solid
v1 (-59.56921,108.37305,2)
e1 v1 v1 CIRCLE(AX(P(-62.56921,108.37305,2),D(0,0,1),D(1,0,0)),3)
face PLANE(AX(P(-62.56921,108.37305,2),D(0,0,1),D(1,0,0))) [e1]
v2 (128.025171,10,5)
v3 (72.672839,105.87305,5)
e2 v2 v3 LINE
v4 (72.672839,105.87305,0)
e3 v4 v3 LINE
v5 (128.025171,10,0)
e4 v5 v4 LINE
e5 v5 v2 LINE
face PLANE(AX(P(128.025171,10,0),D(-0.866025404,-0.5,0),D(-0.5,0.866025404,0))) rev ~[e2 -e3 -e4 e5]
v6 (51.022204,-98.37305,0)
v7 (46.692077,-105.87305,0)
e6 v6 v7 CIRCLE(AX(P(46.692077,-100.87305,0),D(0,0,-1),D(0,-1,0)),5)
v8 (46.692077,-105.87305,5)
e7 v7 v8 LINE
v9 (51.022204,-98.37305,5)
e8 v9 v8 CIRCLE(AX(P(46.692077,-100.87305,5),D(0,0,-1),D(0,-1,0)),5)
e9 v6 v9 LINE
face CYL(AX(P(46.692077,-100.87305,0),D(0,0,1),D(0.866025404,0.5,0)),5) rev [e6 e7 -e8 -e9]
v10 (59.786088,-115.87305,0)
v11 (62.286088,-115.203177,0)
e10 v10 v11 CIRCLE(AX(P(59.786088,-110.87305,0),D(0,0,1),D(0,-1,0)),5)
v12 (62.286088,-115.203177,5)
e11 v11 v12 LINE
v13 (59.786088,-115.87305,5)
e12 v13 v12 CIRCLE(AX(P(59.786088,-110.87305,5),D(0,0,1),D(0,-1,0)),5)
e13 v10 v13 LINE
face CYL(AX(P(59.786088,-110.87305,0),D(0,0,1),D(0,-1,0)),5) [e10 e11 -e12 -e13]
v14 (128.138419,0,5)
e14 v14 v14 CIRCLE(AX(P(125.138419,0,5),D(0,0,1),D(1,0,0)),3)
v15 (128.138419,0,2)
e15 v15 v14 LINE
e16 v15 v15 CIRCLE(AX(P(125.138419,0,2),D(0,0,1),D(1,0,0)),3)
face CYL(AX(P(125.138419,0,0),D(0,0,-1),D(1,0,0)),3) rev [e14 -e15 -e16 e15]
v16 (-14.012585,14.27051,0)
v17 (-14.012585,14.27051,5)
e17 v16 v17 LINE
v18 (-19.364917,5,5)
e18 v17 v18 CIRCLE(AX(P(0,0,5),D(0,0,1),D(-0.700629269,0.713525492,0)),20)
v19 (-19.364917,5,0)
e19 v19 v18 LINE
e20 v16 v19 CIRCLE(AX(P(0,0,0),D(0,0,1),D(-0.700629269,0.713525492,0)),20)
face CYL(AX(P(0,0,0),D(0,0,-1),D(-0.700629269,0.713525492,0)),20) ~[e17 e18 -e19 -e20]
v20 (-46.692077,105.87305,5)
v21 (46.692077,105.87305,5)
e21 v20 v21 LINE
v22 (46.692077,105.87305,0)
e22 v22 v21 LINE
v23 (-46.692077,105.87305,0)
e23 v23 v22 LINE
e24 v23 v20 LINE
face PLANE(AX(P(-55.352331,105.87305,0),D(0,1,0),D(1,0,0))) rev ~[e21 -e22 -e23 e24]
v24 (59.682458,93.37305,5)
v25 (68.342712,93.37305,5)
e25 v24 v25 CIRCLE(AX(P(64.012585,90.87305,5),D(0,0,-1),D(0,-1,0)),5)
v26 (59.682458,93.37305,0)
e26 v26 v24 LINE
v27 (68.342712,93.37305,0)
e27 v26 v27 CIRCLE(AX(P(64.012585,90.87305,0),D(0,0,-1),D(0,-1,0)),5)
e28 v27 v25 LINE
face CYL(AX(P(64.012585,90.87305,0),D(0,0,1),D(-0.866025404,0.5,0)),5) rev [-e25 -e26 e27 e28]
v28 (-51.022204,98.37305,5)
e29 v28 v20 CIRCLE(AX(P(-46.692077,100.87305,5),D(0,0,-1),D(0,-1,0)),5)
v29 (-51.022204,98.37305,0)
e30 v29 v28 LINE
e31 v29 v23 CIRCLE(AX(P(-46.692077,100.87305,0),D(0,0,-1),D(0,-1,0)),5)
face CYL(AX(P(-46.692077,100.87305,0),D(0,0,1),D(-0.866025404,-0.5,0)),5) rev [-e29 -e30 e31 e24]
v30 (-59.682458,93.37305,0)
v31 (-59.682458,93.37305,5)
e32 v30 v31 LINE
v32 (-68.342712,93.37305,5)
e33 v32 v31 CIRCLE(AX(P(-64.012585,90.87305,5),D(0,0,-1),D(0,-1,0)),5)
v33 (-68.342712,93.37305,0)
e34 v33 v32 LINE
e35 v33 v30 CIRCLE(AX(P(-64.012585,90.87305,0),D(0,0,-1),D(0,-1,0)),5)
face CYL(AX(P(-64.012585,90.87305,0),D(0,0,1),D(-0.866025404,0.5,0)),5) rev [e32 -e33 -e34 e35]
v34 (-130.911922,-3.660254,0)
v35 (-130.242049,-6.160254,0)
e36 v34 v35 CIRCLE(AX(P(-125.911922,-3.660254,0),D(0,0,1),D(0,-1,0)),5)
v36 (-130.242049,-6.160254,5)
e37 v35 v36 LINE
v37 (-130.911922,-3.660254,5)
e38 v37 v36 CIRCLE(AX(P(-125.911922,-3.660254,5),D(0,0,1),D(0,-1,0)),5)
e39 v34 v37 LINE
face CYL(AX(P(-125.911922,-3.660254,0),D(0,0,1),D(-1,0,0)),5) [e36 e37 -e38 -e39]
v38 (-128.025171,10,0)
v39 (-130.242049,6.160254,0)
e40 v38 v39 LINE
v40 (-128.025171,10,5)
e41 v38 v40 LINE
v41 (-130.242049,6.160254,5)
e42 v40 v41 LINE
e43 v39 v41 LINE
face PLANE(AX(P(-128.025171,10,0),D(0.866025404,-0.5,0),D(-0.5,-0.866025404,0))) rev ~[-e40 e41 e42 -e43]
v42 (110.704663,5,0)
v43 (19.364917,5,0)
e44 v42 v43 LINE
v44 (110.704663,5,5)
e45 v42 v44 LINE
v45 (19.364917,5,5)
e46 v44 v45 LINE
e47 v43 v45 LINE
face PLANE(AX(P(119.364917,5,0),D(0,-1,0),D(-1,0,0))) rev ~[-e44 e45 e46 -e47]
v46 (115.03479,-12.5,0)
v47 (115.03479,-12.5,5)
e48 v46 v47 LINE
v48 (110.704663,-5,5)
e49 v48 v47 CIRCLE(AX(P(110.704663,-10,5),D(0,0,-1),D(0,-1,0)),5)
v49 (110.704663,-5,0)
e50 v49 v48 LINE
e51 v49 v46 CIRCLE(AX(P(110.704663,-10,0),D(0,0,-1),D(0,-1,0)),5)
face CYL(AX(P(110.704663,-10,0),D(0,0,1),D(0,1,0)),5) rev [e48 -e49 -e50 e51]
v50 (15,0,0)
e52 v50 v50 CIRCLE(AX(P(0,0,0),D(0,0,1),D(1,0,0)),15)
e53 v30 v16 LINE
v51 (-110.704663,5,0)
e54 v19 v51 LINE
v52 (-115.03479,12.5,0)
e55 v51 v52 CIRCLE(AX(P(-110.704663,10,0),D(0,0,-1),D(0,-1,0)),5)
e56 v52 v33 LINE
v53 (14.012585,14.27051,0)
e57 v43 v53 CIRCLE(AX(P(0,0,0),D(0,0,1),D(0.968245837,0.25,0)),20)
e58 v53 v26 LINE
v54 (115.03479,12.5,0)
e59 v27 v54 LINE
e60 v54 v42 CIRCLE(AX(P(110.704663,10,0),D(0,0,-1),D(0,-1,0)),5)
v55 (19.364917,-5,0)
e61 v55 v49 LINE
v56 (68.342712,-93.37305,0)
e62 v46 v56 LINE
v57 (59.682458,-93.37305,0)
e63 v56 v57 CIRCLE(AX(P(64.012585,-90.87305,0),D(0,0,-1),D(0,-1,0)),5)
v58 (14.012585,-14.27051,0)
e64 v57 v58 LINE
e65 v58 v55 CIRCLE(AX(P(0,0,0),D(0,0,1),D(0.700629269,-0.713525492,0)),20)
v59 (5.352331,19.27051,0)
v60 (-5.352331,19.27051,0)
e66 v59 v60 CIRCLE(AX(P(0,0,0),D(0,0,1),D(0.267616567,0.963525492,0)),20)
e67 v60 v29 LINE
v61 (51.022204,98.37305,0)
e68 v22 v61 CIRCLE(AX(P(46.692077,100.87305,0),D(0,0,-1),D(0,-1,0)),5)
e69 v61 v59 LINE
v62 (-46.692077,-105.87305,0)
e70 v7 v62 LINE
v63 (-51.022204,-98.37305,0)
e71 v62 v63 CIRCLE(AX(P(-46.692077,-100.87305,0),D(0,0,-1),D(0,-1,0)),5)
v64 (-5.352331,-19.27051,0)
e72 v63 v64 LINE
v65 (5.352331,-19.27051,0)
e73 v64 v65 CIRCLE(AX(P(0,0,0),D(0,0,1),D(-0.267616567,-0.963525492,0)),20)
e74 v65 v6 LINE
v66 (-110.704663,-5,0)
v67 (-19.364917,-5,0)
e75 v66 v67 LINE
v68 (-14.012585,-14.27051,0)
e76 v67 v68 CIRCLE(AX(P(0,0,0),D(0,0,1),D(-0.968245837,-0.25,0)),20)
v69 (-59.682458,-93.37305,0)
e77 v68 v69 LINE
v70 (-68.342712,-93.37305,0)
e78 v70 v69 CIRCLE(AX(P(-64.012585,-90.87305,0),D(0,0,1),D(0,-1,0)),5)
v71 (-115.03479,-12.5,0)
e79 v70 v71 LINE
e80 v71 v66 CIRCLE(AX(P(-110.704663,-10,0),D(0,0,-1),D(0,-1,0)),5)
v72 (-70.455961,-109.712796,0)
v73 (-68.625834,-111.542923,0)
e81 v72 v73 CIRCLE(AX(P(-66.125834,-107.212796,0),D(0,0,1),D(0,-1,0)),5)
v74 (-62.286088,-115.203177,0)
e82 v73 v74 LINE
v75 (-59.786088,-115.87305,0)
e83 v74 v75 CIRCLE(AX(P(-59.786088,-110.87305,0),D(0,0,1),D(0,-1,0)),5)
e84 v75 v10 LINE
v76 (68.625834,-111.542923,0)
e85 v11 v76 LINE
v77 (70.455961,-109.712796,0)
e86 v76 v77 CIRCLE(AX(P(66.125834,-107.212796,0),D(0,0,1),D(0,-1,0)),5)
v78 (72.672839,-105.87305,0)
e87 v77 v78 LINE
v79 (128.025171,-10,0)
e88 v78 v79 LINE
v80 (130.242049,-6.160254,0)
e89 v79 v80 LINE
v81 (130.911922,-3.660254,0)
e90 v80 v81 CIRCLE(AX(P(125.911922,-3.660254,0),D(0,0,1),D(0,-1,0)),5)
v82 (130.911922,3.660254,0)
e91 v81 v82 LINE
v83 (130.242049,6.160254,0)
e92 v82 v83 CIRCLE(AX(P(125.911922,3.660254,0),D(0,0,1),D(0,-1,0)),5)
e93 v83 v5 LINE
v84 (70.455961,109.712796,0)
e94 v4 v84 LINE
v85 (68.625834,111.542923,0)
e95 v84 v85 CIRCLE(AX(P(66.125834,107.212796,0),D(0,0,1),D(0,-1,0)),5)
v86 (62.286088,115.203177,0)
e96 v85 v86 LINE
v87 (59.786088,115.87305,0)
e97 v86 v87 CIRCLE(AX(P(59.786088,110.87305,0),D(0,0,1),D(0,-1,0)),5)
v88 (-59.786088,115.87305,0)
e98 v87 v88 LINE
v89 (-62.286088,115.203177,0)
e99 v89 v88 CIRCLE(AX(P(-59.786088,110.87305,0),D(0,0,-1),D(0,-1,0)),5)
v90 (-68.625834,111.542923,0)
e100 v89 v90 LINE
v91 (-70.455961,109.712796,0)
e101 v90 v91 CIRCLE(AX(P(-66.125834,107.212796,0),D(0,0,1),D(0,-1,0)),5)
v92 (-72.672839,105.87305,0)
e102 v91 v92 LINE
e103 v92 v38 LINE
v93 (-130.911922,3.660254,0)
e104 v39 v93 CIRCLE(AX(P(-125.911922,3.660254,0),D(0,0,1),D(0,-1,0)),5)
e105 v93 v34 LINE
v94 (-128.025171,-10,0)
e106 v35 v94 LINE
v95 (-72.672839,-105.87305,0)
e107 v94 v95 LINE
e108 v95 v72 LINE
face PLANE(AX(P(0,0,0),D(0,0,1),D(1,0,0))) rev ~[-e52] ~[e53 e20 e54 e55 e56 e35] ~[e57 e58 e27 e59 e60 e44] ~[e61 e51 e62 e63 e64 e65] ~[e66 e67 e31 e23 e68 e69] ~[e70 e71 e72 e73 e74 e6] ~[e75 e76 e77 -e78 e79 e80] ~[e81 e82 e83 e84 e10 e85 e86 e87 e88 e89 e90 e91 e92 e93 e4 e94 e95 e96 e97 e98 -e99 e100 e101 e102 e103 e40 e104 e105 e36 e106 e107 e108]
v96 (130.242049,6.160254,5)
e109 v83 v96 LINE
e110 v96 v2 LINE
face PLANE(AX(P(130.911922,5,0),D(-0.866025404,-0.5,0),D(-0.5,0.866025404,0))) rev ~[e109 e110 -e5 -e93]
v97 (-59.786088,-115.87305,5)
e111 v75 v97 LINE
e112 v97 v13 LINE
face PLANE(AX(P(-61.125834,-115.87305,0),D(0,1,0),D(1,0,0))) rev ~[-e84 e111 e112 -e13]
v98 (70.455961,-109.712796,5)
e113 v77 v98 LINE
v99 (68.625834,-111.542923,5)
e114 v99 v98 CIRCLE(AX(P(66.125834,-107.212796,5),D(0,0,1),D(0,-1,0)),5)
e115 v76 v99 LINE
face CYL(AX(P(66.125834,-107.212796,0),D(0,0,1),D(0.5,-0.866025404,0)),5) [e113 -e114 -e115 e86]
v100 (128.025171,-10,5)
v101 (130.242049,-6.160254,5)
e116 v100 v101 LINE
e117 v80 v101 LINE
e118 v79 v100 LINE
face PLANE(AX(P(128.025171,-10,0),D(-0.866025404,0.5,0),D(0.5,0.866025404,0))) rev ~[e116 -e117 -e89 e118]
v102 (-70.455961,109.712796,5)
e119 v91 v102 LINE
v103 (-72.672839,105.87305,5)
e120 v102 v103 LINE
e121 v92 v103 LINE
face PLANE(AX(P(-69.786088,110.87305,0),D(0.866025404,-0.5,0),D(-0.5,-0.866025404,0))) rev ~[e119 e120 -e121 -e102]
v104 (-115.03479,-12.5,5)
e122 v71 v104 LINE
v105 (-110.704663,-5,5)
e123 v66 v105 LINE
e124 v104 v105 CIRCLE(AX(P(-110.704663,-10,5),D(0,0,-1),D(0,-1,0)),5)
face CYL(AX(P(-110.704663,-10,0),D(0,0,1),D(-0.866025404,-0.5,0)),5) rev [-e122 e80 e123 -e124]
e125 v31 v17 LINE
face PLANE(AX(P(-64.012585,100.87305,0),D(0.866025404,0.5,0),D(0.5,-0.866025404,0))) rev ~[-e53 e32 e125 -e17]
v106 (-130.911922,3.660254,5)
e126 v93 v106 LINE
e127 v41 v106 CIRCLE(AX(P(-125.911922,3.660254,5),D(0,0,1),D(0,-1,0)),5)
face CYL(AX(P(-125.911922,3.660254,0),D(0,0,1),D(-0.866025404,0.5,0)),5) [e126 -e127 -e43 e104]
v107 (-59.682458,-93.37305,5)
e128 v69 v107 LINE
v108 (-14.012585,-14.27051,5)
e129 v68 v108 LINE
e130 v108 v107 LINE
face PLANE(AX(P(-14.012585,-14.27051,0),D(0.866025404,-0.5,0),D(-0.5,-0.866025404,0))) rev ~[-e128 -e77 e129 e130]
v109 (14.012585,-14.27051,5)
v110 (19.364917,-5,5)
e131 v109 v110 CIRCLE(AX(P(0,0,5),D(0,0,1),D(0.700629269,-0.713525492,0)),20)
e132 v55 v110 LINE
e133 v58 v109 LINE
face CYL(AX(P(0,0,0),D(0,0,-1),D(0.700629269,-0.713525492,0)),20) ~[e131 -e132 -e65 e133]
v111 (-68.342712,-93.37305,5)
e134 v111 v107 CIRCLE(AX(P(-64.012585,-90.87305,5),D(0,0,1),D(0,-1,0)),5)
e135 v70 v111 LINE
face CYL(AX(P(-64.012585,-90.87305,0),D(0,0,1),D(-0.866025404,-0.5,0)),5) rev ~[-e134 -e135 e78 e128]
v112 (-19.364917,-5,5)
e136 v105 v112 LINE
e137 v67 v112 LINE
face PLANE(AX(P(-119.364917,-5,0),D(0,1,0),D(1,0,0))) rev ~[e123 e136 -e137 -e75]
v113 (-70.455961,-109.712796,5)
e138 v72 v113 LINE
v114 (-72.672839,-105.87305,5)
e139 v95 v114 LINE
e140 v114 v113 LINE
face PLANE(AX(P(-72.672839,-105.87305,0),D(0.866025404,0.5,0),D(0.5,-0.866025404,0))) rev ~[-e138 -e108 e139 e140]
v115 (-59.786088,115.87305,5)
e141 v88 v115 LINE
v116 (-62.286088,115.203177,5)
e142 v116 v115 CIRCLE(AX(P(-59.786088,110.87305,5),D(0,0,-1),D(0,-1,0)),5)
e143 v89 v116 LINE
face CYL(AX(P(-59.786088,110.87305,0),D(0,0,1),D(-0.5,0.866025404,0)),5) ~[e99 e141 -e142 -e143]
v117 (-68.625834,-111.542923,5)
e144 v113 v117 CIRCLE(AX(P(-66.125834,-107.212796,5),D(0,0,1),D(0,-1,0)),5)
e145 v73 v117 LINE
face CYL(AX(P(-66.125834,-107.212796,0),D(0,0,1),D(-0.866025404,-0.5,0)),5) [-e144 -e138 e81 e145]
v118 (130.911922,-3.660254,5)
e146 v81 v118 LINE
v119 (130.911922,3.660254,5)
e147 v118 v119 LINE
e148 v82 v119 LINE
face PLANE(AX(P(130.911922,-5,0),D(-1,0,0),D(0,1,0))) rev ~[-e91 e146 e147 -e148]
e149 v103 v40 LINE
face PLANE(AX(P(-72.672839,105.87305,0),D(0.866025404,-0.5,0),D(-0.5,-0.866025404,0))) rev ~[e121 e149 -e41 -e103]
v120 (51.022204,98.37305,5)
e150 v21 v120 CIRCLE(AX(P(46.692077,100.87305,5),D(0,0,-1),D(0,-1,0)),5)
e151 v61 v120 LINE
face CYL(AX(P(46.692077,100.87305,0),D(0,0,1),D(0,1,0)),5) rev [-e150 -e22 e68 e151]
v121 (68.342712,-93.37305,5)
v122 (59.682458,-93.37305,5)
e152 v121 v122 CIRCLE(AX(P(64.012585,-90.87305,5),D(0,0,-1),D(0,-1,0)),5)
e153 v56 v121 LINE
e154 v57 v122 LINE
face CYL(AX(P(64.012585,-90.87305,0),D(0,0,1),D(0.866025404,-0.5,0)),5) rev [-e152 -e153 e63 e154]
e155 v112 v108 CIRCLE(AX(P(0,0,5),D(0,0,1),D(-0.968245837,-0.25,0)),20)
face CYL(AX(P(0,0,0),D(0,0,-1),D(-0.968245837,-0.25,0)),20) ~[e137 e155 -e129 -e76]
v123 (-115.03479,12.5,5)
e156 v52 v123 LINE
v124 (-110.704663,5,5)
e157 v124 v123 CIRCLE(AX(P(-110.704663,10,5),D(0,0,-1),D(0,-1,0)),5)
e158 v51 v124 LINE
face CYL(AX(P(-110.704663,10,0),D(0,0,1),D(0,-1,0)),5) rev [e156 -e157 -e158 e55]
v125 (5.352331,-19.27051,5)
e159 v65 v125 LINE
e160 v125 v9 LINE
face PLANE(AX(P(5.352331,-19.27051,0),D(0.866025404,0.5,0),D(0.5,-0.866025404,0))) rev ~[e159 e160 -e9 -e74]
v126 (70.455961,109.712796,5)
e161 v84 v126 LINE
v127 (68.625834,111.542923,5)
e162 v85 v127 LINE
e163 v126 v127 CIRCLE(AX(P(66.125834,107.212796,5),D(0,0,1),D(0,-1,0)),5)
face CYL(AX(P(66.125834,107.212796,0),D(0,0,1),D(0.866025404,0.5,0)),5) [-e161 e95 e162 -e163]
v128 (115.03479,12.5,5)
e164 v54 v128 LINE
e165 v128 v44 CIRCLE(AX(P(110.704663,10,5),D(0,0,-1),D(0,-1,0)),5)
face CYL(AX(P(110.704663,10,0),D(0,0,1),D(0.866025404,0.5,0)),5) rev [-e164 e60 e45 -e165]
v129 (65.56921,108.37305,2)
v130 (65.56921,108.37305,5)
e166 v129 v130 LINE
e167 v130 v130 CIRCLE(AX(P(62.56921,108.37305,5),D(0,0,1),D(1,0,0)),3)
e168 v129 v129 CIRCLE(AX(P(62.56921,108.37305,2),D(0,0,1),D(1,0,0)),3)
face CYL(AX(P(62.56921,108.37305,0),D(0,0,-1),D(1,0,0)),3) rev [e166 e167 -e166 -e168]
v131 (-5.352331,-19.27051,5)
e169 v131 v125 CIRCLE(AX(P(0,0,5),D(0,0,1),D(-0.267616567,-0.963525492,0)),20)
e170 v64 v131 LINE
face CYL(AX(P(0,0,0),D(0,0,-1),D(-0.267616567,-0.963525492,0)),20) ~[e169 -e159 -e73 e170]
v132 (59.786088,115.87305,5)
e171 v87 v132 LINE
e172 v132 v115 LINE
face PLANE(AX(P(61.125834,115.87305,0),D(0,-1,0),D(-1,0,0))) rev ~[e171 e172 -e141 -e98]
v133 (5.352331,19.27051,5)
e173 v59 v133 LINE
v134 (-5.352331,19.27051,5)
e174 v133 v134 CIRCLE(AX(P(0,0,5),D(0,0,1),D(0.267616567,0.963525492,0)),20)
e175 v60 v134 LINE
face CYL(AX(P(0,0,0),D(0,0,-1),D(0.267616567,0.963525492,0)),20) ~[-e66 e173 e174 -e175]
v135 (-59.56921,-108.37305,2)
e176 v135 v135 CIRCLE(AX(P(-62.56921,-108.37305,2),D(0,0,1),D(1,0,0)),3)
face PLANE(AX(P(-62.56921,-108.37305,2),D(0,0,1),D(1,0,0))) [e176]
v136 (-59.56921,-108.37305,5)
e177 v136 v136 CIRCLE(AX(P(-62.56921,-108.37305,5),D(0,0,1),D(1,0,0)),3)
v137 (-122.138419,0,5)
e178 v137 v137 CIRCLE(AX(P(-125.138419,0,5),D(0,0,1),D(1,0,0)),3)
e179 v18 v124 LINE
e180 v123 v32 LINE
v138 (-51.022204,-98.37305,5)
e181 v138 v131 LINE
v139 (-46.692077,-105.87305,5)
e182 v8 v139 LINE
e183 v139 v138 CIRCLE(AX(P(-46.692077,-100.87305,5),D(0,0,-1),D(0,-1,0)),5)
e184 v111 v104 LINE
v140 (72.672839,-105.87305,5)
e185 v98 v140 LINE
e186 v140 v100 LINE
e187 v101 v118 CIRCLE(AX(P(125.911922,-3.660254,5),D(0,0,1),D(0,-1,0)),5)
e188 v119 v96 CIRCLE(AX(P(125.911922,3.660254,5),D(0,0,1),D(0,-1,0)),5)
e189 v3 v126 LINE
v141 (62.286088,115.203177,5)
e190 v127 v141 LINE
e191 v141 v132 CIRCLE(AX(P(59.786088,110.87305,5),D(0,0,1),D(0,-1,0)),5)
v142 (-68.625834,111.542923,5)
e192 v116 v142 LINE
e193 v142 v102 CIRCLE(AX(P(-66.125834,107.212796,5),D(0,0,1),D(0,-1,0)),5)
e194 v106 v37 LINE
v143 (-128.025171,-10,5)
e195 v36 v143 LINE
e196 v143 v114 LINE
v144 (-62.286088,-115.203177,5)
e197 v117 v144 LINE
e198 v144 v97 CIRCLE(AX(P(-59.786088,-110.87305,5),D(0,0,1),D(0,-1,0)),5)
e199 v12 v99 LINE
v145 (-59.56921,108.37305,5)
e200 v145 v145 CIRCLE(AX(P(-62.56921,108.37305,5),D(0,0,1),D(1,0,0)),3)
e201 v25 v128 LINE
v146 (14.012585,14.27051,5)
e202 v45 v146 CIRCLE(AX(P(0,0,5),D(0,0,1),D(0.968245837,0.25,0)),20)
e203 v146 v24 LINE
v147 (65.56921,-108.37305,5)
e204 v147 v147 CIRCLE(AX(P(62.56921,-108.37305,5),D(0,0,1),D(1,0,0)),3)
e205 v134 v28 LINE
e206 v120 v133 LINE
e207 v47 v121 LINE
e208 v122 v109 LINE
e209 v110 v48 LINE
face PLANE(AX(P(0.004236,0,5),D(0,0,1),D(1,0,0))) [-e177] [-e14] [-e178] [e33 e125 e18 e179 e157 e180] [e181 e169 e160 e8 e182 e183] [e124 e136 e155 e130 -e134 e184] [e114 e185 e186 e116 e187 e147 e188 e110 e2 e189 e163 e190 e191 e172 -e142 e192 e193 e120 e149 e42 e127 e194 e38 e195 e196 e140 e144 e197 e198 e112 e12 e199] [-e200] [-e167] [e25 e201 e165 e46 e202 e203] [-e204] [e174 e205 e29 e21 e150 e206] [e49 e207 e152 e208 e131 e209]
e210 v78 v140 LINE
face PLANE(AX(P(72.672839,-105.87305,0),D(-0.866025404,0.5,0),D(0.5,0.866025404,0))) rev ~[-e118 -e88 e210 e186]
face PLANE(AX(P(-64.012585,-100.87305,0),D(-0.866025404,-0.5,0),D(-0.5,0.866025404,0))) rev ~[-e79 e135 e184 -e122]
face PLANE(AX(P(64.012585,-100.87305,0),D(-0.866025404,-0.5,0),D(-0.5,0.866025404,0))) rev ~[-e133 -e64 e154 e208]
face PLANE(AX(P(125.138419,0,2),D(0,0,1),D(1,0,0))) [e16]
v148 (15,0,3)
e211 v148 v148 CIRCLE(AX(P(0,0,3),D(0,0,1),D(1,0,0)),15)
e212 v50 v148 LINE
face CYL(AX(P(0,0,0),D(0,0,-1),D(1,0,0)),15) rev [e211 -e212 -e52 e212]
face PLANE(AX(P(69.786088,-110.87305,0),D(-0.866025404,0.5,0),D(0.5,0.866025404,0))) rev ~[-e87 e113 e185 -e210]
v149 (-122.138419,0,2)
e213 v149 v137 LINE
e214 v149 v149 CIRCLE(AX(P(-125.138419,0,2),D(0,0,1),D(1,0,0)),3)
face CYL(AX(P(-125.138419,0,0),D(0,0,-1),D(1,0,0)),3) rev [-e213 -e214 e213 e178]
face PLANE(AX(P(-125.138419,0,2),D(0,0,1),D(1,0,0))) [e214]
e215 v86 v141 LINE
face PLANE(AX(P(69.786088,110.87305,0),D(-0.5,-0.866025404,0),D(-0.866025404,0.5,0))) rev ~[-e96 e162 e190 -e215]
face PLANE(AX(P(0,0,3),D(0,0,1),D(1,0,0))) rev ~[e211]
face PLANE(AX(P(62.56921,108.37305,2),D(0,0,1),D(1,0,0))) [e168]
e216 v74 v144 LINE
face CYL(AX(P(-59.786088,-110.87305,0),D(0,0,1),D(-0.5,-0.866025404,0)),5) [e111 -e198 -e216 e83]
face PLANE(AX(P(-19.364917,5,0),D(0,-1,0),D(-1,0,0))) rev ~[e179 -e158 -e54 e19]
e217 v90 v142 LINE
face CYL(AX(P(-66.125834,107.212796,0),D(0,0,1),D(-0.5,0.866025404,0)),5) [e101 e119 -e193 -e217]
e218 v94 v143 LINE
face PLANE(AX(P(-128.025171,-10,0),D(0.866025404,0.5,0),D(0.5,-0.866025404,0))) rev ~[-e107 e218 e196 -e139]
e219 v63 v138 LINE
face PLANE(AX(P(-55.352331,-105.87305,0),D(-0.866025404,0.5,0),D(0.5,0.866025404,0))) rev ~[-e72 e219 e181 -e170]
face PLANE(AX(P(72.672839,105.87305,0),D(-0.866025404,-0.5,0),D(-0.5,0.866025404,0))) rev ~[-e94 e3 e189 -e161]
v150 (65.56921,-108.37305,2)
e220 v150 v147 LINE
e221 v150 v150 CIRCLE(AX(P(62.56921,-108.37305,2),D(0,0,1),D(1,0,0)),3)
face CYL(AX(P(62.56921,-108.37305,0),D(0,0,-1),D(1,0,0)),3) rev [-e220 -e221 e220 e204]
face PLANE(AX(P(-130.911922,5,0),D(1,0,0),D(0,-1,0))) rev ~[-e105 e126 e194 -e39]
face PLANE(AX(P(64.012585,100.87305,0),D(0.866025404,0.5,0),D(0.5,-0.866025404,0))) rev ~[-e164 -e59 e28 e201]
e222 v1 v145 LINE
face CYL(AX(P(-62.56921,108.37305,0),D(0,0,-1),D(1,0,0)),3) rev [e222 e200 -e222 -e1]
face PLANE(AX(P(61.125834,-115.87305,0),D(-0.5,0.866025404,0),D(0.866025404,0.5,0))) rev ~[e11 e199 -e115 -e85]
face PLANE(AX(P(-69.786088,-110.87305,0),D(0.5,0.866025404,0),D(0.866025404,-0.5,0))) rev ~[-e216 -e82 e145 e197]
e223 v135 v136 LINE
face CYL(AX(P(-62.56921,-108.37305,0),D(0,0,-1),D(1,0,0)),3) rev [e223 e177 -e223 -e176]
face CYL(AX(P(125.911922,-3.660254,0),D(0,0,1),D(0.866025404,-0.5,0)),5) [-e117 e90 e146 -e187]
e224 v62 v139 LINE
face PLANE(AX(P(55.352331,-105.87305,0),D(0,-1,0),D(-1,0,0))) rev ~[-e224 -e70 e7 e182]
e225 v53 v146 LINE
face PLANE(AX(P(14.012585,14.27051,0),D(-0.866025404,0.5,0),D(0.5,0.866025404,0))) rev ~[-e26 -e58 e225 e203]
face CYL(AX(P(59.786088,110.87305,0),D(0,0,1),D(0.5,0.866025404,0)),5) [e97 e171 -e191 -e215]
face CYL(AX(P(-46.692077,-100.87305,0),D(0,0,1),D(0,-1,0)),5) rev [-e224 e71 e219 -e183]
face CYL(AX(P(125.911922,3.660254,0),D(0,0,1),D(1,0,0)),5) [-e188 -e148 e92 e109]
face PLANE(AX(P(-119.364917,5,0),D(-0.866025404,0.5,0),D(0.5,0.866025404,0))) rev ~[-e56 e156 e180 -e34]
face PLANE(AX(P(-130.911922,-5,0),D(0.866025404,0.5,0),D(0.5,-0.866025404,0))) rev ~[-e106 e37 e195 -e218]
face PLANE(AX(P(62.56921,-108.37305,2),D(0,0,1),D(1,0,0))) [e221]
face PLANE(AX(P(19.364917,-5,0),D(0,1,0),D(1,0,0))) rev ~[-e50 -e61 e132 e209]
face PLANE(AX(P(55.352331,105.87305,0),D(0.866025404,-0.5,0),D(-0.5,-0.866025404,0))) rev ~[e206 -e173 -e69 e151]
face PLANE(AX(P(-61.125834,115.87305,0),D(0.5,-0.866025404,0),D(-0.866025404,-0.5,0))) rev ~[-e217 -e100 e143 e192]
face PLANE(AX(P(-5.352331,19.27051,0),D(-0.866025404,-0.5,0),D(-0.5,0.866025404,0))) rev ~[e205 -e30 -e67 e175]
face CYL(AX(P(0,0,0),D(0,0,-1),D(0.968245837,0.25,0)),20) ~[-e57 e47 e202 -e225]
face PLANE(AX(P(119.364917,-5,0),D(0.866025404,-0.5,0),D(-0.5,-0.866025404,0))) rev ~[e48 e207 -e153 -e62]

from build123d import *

# Parameters (mm, degrees)
F0_R     = 3
F1_DEPTH = 5
F2_DEPTH = 2
F3_R     = 5
F4_R     = 5
F0_R_2   = 15
F5_DEPTH = 5
F6_DEPTH = 5
F7_DEPTH = 3


# Not quite as in the source:
# - a feature names something its author has since deleted; it is built from what else it names


with BuildPart() as f1:
    # F0 (on Top) → F1 (new body)
    with BuildSketch(Plane.XY):
        Polygon((55.3523313466, 115.8730502097), (-55.3523313466, 115.8730502097), (-61.1258340385, 115.8730502097), (-69.7860880763, 110.8730502097), (-72.6728394223, 105.8730502097), (-128.0251707689, 10), (-130.9119221148, 5), (-130.9119221148, -5), (-128.0251707689, -10), (-72.6728394223, -105.8730502097), (-69.7860880763, -110.8730502097), (-61.1258340385, -115.8730502097), (-55.3523313466, -115.8730502097), (55.3523313466, -115.8730502097), (61.1258340385, -115.8730502097), (69.7860880763, -110.8730502097), (72.6728394223, -105.8730502097), (128.0251707689, -10), (130.9119221148, -5), (130.9119221148, 5), (128.0251707689, 10), (72.6728394223, 105.8730502097), (69.7860880763, 110.8730502097), (61.1258340385, 115.8730502097), align=None)
        with Locations((-62.5692097115, -108.3730502097)):
            Circle(F0_R, mode=Mode.SUBTRACT)
        with Locations((62.5692097115, -108.3730502097)):
            Circle(F0_R, mode=Mode.SUBTRACT)
        with Locations((-125.1384194229, 0)):
            Circle(F0_R, mode=Mode.SUBTRACT)
        Polygon((-119.364916731, -5), (-119.364916731, 0), (-119.364916731, 5), (-64.0125853844, 100.8730502097), (-59.6824583655, 103.3730502097), (-55.3523313466, 105.8730502097), (55.3523313466, 105.8730502097), (59.6824583655, 103.3730502097), (64.0125853844, 100.8730502097), (119.364916731, 5), (119.364916731, 0), (119.364916731, -5), (64.0125853844, -100.8730502097), (59.6824583655, -103.3730502097), (55.3523313466, -105.8730502097), (-55.3523313466, -105.8730502097), (-59.6824583655, -103.3730502097), (-64.0125853844, -100.8730502097), align=None, mode=Mode.SUBTRACT)
        with Locations((-62.5692097115, 108.3730502097)):
            Circle(F0_R, mode=Mode.SUBTRACT)
        with Locations((125.1384194229, 0)):
            Circle(F0_R, mode=Mode.SUBTRACT)
        with Locations((62.5692097115, 108.3730502097)):
            Circle(F0_R, mode=Mode.SUBTRACT)
        with BuildLine():
            Line((-59.6824583655, 103.3730502097), (-64.0125853844, 100.8730502097))
            Line((-64.0125853844, 100.8730502097), (-14.0125853844, 14.2705098312))
            ThreePointArc((-14.0125853844, 14.2705098312), (-10, 17.3205080757), (-5.3523313466, 19.2705098312))
            Line((-5.3523313466, 19.2705098312), (-55.3523313466, 105.8730502097))
            Line((-55.3523313466, 105.8730502097), (-59.6824583655, 103.3730502097))
        make_face()
        with BuildLine():
            Line((55.3523313466, 105.8730502097), (5.3523313466, 19.2705098312))
            ThreePointArc((5.3523313466, 19.2705098312), (10, 17.3205080757), (14.0125853844, 14.2705098312))
            Line((14.0125853844, 14.2705098312), (64.0125853844, 100.8730502097))
            Line((64.0125853844, 100.8730502097), (59.6824583655, 103.3730502097))
            Line((59.6824583655, 103.3730502097), (55.3523313466, 105.8730502097))
        make_face()
        with BuildLine():
            Line((119.364916731, 5), (19.364916731, 5))
            ThreePointArc((19.364916731, 5), (19.8405939253, 2.5200858497), (20, 0))
            ThreePointArc((20, 0), (19.8405939253, -2.5200858497), (19.364916731, -5))
            Line((19.364916731, -5), (119.364916731, -5))
            Line((119.364916731, -5), (119.364916731, 0))
            Line((119.364916731, 0), (119.364916731, 5))
        make_face()
        with BuildLine():
            ThreePointArc((14.0125853844, -14.2705098312), (10, -17.3205080757), (5.3523313466, -19.2705098312))
            Line((5.3523313466, -19.2705098312), (55.3523313466, -105.8730502097))
            Line((55.3523313466, -105.8730502097), (59.6824583655, -103.3730502097))
            Line((59.6824583655, -103.3730502097), (64.0125853844, -100.8730502097))
            Line((64.0125853844, -100.8730502097), (14.0125853844, -14.2705098312))
        make_face()
        with BuildLine():
            Line((-14.0125853844, -14.2705098312), (-64.0125853844, -100.8730502097))
            Line((-64.0125853844, -100.8730502097), (-59.6824583655, -103.3730502097))
            Line((-59.6824583655, -103.3730502097), (-55.3523313466, -105.8730502097))
            Line((-55.3523313466, -105.8730502097), (-5.3523313466, -19.2705098312))
            ThreePointArc((-5.3523313466, -19.2705098312), (-10, -17.3205080757), (-14.0125853844, -14.2705098312))
        make_face()
        with BuildLine():
            Line((-119.364916731, 5), (-119.364916731, 0))
            Line((-119.364916731, 0), (-119.364916731, -5))
            Line((-119.364916731, -5), (-19.364916731, -5))
            ThreePointArc((-19.364916731, -5), (-20, 0), (-19.364916731, 5))
            Line((-19.364916731, 5), (-119.364916731, 5))
        make_face()
    extrude(amount=F1_DEPTH)

    # F0 (on Top) → F2 (join)
    with BuildSketch(Plane.XY):
        with Locations((-125.1384194229, 0)):
            Circle(F0_R)
        with Locations((-62.5692097115, 108.3730502097)):
            Circle(F0_R)
        with Locations((62.5692097115, 108.3730502097)):
            Circle(F0_R)
        with Locations((125.1384194229, 0)):
            Circle(F0_R)
        with Locations((62.5692097115, -108.3730502097)):
            Circle(F0_R)
        with Locations((-62.5692097115, -108.3730502097)):
            Circle(F0_R)
    extrude(amount=F2_DEPTH)

    # F3
    f3_edges = [f1.edges().sort_by_distance(p)[0] for p in [
        (-130.911922, 5, 2.5),
        (-130.911922, -5, 2.5),
        (-69.786088, -110.87305, 2.5),
        (-61.125834, -115.87305, 2.5),
        (61.125834, -115.87305, 2.5),
        (69.786088, -110.87305, 2.5),
        (130.911922, -5, 2.5),
        (130.911922, 5, 2.5),
        (69.786088, 110.87305, 2.5),
        (61.125834, 115.87305, 2.5),
        (-61.125834, 115.87305, 2.5),
        (-69.786088, 110.87305, 2.5),
    ]]
    fillet(f3_edges, radius=F3_R)

    # F4
    f4_edges = [f1.edges().sort_by_distance(p)[0] for p in [
        (-64.012585, 100.87305, 2.5),
        (-55.352331, 105.87305, 2.5),
        (55.352331, 105.87305, 2.5),
        (64.012585, 100.87305, 2.5),
        (119.364917, 5, 2.5),
        (119.364917, -5, 2.5),
        (64.012585, -100.87305, 2.5),
        (55.352331, -105.87305, 2.5),
        (-55.352331, -105.87305, 2.5),
        (-64.012585, -100.87305, 2.5),
        (-119.364917, -5, 2.5),
        (-119.364917, 5, 2.5),
    ]]
    fillet(f4_edges, radius=F4_R)

    # F0 (on Top) → F5 (join)
    with BuildSketch(Plane.XY):
        with BuildLine():
            ThreePointArc((-14.0125853844, 14.2705098312), (-17.3205080757, 10), (-19.364916731, 5))
            ThreePointArc((-19.364916731, 5), (-20, 0), (-19.364916731, -5))
            ThreePointArc((-19.364916731, -5), (-17.3205080757, -10), (-14.0125853844, -14.2705098312))
            ThreePointArc((-14.0125853844, -14.2705098312), (-10, -17.3205080757), (-5.3523313466, -19.2705098312))
            ThreePointArc((-5.3523313466, -19.2705098312), (0, -20), (5.3523313466, -19.2705098312))
            ThreePointArc((5.3523313466, -19.2705098312), (10, -17.3205080757), (14.0125853844, -14.2705098312))
            ThreePointArc((14.0125853844, -14.2705098312), (17.3205080757, -10), (19.364916731, -5))
            ThreePointArc((19.364916731, -5), (19.8405939253, -2.5200858497), (20, 0))
            ThreePointArc((20, 0), (19.8405939253, 2.5200858497), (19.364916731, 5))
            ThreePointArc((19.364916731, 5), (17.3205080757, 10), (14.0125853844, 14.2705098312))
            ThreePointArc((14.0125853844, 14.2705098312), (10, 17.3205080757), (5.3523313466, 19.2705098312))
            ThreePointArc((5.3523313466, 19.2705098312), (0, 20), (-5.3523313466, 19.2705098312))
            ThreePointArc((-5.3523313466, 19.2705098312), (-10, 17.3205080757), (-14.0125853844, 14.2705098312))
        make_face()
        Circle(F0_R_2, mode=Mode.SUBTRACT)
    extrude(amount=F5_DEPTH)

    # F0 (on Top) → F6 (join)
    with BuildSketch(Plane.XY):
        Circle(F0_R_2)
    extrude(amount=F6_DEPTH)

    # F0 (on Top) → F7 (cut)
    with BuildSketch(Plane.XY):
        Circle(F0_R_2)
    extrude(amount=F7_DEPTH, mode=Mode.SUBTRACT)


solid = f1.part
